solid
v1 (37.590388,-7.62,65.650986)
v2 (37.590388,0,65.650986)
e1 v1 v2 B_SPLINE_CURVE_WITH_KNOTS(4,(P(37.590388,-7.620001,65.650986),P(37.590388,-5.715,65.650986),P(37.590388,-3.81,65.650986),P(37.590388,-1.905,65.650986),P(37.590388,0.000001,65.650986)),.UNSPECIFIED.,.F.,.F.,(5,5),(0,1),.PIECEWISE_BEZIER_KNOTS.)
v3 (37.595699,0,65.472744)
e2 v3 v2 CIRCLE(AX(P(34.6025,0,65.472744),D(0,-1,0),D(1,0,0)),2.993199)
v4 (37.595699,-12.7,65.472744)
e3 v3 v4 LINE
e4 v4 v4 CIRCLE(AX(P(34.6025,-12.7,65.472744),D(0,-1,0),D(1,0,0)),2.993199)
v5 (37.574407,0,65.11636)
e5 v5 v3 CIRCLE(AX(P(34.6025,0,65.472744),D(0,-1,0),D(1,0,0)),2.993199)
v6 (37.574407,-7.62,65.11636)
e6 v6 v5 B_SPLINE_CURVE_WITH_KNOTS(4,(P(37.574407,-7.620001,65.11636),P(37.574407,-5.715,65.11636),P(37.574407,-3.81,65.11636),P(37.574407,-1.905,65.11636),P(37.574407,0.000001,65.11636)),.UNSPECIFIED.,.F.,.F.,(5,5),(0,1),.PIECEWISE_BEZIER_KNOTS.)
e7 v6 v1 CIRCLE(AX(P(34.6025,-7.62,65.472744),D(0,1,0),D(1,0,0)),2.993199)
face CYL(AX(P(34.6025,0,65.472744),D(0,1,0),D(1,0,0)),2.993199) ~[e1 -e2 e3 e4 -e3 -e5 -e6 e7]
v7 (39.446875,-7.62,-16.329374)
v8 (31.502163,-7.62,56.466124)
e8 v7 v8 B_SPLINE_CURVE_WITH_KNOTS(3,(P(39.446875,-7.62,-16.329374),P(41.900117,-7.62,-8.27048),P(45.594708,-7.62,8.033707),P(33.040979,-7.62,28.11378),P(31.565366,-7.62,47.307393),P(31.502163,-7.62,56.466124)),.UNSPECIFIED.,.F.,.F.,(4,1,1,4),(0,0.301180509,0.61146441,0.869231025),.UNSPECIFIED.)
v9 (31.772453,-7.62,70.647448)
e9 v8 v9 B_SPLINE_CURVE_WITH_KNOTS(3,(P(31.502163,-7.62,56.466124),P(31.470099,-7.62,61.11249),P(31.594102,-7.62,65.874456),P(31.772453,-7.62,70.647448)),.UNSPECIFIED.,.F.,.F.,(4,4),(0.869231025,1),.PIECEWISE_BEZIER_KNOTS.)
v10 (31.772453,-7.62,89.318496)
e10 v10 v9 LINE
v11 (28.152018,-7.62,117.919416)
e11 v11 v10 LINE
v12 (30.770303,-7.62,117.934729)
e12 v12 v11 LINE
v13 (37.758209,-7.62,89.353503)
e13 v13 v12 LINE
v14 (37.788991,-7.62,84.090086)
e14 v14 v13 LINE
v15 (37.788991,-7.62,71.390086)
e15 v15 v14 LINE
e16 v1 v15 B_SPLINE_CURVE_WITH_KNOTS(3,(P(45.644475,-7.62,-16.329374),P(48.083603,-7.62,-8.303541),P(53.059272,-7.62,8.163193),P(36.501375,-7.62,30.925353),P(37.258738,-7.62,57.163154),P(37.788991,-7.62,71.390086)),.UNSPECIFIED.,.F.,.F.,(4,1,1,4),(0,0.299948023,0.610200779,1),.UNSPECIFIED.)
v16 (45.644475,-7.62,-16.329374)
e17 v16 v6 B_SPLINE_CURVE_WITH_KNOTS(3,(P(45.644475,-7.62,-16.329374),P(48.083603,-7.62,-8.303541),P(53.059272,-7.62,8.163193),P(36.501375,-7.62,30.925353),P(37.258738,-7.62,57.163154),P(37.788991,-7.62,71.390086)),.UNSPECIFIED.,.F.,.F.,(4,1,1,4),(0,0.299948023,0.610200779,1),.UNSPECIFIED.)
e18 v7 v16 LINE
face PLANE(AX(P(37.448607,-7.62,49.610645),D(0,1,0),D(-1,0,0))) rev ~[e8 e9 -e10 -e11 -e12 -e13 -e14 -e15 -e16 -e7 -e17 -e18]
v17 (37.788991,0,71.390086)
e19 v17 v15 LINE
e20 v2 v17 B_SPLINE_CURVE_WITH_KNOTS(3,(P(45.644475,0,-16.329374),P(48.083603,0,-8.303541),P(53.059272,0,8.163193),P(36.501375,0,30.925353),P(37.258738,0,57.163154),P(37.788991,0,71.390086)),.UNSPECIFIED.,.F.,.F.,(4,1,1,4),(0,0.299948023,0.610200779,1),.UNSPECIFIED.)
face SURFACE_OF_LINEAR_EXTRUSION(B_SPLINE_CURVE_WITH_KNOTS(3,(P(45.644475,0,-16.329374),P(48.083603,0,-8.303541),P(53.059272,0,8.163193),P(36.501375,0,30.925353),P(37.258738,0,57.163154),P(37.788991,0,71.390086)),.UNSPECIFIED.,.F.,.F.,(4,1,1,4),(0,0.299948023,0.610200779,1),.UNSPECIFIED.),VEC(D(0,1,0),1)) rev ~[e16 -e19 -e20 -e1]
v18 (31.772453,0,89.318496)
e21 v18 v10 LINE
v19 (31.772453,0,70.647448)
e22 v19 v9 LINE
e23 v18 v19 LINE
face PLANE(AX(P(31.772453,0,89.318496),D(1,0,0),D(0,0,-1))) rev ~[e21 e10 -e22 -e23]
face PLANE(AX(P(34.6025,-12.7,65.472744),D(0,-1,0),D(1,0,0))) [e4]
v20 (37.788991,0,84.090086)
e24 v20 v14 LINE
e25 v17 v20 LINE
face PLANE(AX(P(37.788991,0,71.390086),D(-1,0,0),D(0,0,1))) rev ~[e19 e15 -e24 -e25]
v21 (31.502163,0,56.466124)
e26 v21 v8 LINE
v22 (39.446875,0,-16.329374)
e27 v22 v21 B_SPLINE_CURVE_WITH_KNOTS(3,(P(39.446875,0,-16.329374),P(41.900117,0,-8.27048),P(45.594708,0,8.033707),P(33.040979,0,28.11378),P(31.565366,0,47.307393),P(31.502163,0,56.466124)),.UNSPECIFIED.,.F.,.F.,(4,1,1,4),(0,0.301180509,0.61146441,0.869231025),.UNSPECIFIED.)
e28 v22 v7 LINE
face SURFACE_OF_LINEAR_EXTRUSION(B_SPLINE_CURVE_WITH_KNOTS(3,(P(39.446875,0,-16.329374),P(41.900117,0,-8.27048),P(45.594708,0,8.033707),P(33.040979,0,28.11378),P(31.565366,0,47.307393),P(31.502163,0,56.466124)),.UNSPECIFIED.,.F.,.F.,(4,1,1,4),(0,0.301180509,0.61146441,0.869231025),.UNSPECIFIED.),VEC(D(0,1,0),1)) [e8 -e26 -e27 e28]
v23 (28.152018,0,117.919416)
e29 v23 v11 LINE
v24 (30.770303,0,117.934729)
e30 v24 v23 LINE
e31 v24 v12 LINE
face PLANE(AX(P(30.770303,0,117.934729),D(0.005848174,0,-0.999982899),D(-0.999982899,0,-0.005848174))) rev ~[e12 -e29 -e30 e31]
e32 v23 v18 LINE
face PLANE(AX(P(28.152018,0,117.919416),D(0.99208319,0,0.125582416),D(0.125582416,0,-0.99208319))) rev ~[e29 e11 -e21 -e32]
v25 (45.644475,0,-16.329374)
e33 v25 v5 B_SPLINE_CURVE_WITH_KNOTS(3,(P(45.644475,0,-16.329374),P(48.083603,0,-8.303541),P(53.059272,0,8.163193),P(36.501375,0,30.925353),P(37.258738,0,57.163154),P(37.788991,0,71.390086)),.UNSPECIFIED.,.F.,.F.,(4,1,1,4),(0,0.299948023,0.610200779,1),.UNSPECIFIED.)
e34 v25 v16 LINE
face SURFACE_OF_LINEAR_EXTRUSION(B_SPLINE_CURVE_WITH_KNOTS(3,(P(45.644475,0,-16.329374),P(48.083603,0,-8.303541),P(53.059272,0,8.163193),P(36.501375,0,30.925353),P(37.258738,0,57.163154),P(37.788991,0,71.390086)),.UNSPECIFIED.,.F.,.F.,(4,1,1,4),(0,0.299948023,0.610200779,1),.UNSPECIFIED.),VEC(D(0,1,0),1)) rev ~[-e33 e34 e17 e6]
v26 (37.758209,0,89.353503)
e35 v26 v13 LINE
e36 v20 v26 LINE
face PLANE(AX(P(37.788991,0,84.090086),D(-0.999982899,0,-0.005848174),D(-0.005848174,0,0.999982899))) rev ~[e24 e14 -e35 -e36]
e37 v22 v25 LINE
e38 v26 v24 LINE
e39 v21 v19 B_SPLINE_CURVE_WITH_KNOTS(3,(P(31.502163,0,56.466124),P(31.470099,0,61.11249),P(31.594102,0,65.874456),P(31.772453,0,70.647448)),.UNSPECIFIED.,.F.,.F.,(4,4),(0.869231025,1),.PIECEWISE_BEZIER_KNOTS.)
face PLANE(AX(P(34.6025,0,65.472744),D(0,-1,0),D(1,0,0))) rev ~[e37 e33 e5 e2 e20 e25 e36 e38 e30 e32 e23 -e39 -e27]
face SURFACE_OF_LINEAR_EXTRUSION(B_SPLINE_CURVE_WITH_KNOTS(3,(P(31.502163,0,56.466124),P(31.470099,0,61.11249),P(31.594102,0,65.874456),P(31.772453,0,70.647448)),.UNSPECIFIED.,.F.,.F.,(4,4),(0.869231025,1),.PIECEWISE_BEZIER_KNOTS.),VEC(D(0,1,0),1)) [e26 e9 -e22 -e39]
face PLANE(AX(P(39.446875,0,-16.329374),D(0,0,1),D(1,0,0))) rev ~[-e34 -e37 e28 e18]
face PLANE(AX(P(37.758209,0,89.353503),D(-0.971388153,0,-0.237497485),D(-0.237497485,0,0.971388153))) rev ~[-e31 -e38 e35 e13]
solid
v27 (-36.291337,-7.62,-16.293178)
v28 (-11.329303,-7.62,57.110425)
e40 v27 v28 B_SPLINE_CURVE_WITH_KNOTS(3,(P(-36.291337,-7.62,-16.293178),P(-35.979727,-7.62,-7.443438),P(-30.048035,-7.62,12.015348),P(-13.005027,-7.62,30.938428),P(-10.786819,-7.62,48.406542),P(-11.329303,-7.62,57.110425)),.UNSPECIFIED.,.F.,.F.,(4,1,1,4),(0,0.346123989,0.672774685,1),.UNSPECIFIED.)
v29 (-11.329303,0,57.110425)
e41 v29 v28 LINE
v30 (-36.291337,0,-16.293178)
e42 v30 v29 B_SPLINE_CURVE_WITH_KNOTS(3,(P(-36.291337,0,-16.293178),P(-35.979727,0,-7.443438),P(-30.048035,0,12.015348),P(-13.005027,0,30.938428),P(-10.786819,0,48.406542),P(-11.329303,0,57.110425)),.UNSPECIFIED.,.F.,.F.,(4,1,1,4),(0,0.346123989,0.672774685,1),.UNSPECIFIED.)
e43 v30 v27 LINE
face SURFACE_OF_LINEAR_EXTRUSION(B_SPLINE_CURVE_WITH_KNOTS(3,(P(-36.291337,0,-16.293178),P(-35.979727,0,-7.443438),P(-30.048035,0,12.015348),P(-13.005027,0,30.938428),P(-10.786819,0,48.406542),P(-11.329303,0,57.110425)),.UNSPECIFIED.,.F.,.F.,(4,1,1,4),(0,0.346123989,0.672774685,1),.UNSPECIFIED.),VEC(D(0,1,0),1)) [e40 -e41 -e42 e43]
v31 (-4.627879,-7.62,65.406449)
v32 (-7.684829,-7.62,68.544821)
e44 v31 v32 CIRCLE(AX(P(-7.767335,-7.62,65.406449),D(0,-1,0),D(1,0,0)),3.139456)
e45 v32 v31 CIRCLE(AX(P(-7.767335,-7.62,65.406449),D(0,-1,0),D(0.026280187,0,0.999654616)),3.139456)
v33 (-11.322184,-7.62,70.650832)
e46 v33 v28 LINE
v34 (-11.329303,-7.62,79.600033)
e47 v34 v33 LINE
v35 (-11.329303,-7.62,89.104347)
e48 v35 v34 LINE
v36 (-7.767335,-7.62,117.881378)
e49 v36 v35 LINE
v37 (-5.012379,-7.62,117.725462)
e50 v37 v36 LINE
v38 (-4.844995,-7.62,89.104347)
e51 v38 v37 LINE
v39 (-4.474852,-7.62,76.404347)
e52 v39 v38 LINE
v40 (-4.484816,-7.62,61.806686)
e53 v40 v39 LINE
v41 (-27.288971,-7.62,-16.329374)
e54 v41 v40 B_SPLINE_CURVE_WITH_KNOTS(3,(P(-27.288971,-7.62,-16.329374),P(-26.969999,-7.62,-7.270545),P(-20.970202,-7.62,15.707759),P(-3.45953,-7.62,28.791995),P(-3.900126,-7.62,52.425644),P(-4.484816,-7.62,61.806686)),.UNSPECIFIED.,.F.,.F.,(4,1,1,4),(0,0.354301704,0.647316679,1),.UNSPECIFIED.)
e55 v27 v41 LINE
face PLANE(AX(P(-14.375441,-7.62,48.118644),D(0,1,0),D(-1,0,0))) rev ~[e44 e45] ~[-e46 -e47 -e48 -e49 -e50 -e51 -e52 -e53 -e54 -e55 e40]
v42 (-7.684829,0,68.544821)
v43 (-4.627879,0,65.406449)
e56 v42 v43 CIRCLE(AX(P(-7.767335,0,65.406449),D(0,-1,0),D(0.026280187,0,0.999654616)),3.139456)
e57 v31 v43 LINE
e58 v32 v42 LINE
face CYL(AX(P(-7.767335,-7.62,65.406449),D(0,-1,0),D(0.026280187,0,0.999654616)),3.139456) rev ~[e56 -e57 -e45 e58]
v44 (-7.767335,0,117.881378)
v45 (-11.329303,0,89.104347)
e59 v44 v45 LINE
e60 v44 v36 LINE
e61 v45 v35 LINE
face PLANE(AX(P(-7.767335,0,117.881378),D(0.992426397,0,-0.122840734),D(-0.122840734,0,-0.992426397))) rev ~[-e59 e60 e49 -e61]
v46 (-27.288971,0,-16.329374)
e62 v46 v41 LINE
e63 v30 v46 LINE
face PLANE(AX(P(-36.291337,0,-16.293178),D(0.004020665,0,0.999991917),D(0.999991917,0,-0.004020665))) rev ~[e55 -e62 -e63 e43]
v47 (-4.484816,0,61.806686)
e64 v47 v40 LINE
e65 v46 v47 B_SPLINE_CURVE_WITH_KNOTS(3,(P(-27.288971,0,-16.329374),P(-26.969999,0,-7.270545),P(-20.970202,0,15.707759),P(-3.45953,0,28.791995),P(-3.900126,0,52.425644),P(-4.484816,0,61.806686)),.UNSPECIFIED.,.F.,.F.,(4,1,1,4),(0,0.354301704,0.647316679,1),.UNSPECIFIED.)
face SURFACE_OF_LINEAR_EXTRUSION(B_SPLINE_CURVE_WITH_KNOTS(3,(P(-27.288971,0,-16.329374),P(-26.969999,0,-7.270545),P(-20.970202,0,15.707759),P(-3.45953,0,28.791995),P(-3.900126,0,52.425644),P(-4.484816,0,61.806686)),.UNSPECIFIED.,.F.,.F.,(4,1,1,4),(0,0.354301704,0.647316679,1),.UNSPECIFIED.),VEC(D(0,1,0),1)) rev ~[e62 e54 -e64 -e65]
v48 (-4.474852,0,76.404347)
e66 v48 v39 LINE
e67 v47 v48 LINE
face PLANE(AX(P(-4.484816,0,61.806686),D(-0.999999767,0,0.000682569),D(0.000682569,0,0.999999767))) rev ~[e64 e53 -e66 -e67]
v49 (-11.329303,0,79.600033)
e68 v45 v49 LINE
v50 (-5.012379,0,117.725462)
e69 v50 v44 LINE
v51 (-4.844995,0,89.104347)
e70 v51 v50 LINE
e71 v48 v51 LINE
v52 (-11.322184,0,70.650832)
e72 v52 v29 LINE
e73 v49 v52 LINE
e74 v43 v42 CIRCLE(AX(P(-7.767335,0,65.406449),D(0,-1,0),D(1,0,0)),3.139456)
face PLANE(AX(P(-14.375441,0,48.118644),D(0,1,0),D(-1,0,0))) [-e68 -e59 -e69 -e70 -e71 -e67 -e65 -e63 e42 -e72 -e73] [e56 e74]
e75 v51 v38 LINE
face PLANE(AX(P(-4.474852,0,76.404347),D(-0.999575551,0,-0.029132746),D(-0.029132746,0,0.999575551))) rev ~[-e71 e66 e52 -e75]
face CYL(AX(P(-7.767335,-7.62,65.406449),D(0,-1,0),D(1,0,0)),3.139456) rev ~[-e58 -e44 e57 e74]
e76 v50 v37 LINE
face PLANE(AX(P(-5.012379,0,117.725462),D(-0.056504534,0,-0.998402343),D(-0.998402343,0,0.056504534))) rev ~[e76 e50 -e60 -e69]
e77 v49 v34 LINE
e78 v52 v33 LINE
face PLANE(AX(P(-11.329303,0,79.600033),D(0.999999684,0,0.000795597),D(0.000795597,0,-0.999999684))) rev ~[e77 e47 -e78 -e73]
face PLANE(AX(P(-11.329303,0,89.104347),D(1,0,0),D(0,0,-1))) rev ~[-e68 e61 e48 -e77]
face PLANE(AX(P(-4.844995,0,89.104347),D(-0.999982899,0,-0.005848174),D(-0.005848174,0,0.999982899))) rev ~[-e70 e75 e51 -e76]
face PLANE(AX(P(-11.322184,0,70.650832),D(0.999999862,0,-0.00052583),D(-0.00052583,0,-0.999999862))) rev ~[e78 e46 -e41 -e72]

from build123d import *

# Parameters (mm, degrees)
F1_DEPTH = 7.62
F2_DEPTH = 7.62
F3_R     = 2.9931989814
F5_DEPTH = 12.7
F3_R_2   = 3.7293138993
F6_DEPTH = 25.4
F8_DEPTH = 25.4


# Not quite as in the source:
# - the program builds the solid bodies; features that only make, move or delete a surface that nothing else refers to are left out


with BuildPart() as f1:
    # F0 (on Front) → F1 (new body)
    with BuildSketch(Plane.XZ):
        with BuildLine():
            add(Edge.make_bspline(
                [(39.446875453, -16.3293741643), (41.9001167123, -8.2704796171), (45.5947084864, 8.0337070769), (33.0409793146, 28.1137801453), (31.5653655238, 47.3073931738), (31.5021629172, 56.4661241863)],
                knots=[0, 0, 0, 0, 0.3011805087, 0.61146441, 0.8692310246, 0.8692310246, 0.8692310246, 0.8692310246], degree=3))
            Line((39.446875453, -16.3293741643), (45.644475453, -16.3293741643))
            add(Edge.make_bspline(
                [(45.644475453, -16.3293741643), (48.0836032329, -8.303541327), (53.0592723839, 8.1631929353), (36.5013753886, 30.9253527959), (37.2587382897, 57.1631543308), (37.7889908314, 71.3900855683)],
                knots=[0, 0, 0, 0, 0.2999480229, 0.6102007791, 1, 1, 1, 1], degree=3))
            Line((37.7889908314, 71.3900855683), (37.7889908314, 84.0900855683))
            Line((37.7889908314, 84.0900855683), (37.7582089288, 89.353502548))
            Line((37.7582089288, 89.353502548), (30.7703027195, 117.9347286346))
            Line((30.7703027195, 117.9347286346), (28.1520184027, 117.9194161915))
            Line((28.1520184027, 117.9194161915), (31.7724533379, 89.3184962116))
            Line((31.7724533379, 89.3184962116), (31.7724533379, 83.3474483013))
            Line((31.7724533379, 83.3474483013), (31.7724533379, 70.6474483013))
            add(Edge.make_bspline(
                [(31.5021629172, 56.4661241863), (31.470099261, 61.1124895525), (31.5941022469, 65.8744563999), (31.7724533379, 70.6474483013)],
                knots=[0.8692310246, 0.8692310246, 0.8692310246, 0.8692310246, 1, 1, 1, 1], degree=3))
        make_face()
    extrude(amount=F1_DEPTH)

    # F3 (on Front) → F5 (join)
    with BuildSketch(Plane.XZ):
        with Locations((34.6025004983, 65.4727444053)):
            Circle(F3_R)
    extrude(amount=F5_DEPTH)

    # F3 (on Front) → F6 (cut)
    with BuildSketch(Plane.XZ):
        with Locations((-7.5630368665, 65.4727444053)):
            Circle(F3_R_2)
    extrude(amount=-F6_DEPTH, mode=Mode.SUBTRACT)


with BuildPart() as f2:
    # F0 (on Front) → F2 (new body)
    with BuildSketch(Plane.XZ):
        with BuildLine():
            add(Edge.make_bspline(
                [(-36.291336976, -16.2931783742), (-35.9797269437, -7.4434377304), (-30.0480350171, 12.015348302), (-13.0050265683, 30.9384280949), (-10.7868187806, 48.4065419002), (-11.3293034956, 57.1104250848)],
                knots=[0, 0, 0, 0, 0.3461239889, 0.6727746853, 1, 1, 1, 1], degree=3))
            Line((-36.291336976, -16.2931783742), (-27.2889714688, -16.3293741643))
            add(Edge.make_bspline(
                [(-27.2889714688, -16.3293741643), (-26.9699991675, -7.2705447074), (-20.9702017655, 15.7077591395), (-3.4595302989, 28.7919953348), (-3.9001260053, 52.4256435308), (-4.4848158276, 61.8066855623)],
                knots=[0, 0, 0, 0, 0.3543017036, 0.6473166786, 1, 1, 1, 1], degree=3))
            Line((-4.4848158276, 61.8066855623), (-4.4748519132, 76.4043473555))
            Line((-4.4748519132, 76.4043473555), (-4.8449948946, 89.1043473555))
            Line((-4.8449948946, 89.1043473555), (-5.0123790024, 117.7254617214))
            Line((-5.0123790024, 117.7254617214), (-7.7673349517, 117.8813783243))
            Line((-7.7673349517, 117.8813783243), (-11.3293034956, 89.1043473555))
            Line((-11.3293034956, 89.1043473555), (-11.3293034956, 85.981985124))
            Line((-11.3293034956, 85.981985124), (-11.3293034956, 79.6000332555))
            Line((-11.3293034956, 79.6000332555), (-11.3221835393, 70.6508324852))
            Line((-11.3221835393, 70.6508324852), (-11.3293034956, 57.1104250848))
        make_face()
    extrude(amount=F2_DEPTH)

    # F7 (on face) → F8 (cut)
    with BuildSketch(Plane.XZ.offset(7.62)):
        with BuildLine():
            ThreePointArc((-7.6848294678, 68.5448205068), (-10.0162462779, 63.2158830381), (-4.627879267, 65.4064491391))
            ThreePointArc((-4.627879267, 65.4064491391), (-5.5184236255, 67.5970152401), (-7.6848294678, 68.5448205068))
        make_face()
    extrude(amount=-F8_DEPTH, mode=Mode.SUBTRACT)


solid = Compound([f1.part, f2.part])
